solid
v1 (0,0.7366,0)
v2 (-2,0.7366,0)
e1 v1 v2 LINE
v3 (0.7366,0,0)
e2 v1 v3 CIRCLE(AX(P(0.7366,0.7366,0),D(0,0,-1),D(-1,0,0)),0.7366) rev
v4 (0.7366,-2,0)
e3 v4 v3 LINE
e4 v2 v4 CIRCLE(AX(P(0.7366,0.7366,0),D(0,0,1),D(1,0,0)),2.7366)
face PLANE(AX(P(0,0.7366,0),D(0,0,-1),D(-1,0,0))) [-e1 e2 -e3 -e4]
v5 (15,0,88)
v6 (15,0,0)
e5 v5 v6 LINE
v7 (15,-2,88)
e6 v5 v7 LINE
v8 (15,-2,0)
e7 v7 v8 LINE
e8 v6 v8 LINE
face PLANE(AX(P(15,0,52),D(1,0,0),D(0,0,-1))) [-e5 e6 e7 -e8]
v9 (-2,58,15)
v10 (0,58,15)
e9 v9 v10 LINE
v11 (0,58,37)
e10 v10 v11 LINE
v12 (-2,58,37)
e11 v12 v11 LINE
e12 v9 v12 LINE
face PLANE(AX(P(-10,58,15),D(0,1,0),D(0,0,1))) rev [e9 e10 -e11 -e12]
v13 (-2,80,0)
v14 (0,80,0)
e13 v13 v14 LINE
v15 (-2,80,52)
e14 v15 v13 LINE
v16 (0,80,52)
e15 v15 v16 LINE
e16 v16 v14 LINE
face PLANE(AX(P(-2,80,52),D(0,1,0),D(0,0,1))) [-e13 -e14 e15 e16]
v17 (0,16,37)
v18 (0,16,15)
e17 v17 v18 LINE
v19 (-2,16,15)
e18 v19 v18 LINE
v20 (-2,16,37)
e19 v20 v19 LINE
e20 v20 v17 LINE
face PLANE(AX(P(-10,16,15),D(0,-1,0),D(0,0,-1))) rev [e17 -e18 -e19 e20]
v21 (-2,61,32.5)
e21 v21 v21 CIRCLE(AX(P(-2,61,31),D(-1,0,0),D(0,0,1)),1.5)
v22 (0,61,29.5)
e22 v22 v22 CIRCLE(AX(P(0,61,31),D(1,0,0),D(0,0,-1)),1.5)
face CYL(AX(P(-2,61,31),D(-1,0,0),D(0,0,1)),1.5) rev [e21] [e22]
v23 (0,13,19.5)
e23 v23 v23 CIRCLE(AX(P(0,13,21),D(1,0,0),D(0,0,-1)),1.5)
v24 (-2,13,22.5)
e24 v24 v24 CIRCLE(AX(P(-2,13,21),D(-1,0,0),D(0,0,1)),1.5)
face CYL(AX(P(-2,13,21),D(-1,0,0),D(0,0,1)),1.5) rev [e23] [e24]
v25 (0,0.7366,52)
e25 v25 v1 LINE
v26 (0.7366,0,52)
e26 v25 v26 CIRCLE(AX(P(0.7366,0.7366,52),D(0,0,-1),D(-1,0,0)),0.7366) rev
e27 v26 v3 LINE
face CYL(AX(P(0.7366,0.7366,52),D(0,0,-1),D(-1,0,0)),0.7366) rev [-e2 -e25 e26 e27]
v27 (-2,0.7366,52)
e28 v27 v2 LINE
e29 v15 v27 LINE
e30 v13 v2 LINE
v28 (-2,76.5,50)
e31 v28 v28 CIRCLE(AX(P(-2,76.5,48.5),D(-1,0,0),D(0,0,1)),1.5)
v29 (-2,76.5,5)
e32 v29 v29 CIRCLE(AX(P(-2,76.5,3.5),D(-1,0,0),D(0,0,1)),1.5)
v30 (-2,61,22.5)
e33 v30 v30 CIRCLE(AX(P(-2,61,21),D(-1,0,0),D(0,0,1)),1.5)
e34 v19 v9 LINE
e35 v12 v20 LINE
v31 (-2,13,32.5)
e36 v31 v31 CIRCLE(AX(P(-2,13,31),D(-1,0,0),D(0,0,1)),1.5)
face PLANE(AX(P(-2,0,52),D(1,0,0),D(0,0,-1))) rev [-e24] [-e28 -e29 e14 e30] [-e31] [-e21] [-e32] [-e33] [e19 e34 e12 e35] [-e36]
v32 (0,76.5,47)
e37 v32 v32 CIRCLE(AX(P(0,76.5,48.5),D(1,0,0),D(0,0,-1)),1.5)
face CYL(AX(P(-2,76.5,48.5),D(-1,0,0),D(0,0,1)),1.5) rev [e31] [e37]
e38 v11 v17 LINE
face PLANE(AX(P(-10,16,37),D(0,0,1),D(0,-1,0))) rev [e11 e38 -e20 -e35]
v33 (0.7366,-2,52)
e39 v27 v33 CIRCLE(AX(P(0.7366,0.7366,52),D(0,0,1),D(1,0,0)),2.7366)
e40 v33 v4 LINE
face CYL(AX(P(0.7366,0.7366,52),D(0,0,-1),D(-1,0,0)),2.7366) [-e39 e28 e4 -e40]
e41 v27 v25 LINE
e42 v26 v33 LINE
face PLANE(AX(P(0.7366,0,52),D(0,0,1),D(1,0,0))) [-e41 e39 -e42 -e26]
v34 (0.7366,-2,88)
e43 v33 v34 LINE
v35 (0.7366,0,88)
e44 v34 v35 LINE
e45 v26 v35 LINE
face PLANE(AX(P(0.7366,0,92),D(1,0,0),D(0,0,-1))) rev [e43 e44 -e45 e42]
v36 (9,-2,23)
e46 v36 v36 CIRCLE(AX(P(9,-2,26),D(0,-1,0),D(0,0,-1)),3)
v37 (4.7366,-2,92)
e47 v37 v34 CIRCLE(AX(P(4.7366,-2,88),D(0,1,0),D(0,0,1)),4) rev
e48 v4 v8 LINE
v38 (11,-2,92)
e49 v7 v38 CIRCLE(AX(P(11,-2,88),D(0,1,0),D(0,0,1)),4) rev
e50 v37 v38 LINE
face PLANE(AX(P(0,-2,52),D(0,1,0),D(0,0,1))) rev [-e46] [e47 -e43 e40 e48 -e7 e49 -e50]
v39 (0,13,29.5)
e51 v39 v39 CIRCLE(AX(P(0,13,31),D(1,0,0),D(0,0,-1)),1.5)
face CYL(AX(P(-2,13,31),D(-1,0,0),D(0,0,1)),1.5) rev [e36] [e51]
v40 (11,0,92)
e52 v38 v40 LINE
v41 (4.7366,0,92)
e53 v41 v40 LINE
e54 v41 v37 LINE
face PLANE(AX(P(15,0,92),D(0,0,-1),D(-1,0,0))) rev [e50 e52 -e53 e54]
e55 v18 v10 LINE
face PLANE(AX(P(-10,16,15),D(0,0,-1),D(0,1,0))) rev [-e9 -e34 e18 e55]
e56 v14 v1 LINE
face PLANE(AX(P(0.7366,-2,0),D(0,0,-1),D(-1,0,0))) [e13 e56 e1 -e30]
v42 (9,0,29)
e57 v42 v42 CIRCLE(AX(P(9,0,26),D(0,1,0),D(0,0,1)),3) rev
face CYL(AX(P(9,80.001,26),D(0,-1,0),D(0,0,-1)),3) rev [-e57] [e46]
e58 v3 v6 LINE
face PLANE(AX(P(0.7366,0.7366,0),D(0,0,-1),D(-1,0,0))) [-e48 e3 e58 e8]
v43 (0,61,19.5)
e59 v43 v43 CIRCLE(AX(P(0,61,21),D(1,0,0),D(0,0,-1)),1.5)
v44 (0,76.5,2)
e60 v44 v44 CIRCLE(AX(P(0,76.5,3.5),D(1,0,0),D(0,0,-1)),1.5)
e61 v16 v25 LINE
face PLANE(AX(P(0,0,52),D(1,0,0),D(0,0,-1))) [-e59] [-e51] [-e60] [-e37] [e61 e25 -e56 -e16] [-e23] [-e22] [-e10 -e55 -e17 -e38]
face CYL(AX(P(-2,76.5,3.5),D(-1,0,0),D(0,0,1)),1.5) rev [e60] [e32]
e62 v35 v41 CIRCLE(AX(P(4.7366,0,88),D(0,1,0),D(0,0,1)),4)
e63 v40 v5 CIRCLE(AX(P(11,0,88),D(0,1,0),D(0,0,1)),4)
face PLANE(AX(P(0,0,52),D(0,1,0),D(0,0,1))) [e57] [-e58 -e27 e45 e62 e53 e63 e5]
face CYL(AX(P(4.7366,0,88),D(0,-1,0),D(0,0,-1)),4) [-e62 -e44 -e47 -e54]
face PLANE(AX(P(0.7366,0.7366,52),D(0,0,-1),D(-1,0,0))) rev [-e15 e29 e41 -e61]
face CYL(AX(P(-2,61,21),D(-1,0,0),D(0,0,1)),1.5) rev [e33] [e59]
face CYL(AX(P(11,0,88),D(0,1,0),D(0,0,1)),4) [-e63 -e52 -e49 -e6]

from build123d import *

# Parameters (mm, degrees)
SM_BASE_FLANGE_1_DEPTH       = 52
CUT_EXTRUDE_1_REACH          = 100.25
SKETCH_6_R                   = 3
HOLE_WIZARD_M3_2_D           = 2.5
HOLE_WIZARD_M3_2_DEPTH       = 7.5
HOLE_WIZARD_M3_2_CBORE_D     = 3
HOLE_WIZARD_M3_2_CBORE_DEPTH = 6
HOLE_WIZARD_M3_2_TIP         = 0.751075774
SKETCH_9_W                   = 22
SKETCH_9_H                   = 42
CUT_EXTRUDE_2_DEPTH          = 10
SKETCH_10_W                  = 40
SKETCH_10_H                  = 14.2634
EXTRUDE_4_DEPTH              = 2
FILLET_1_R                   = 4


# Sheet-metal steps are written as plain solids
with BuildPart() as part:
    # Sketch 1 → 基材-凸緣1 (new body)
    with BuildSketch(Plane.XY):
        with BuildLine():
            Line((0, 80), (0, 0.7366))
            ThreePointArc((0, 0.7366), (0.215745145, 0.215745145), (0.7366, 0))
            Line((0.7366, 0), (15, 0))
            Line((15, 0), (15, -2))
            Line((15, -2), (0.7366, -2))
            ThreePointArc((0.7366, -2), (-1.198468417, -1.198468417), (-2, 0.7366))
            Line((-2, 0.7366), (-2, 80))
            Line((-2, 80), (0, 80))
        make_face()
    extrude(amount=SM_BASE_FLANGE_1_DEPTH)

    # 草圖6 → 除料-伸長1 (cut, up to next)
    with BuildSketch(Plane.XZ.offset(2), mode=Mode.PRIVATE) as cut_extrude_1_sk1:
        with Locations(Location((9, 26, 0), (0, 0, 270))):
            Circle(SKETCH_6_R)
    cut_extrude_1_tool1 = extrude(cut_extrude_1_sk1.sketch, amount=-CUT_EXTRUDE_1_REACH, mode=Mode.PRIVATE) & part.part
    add(cut_extrude_1_tool1.solids().sort_by_distance((9, -2, 26))[0], mode=Mode.SUBTRACT)

    # M3 螺紋孔2
    with Locations(Plane.ZY.offset(2)):
        with Locations((21, 61), (21, 13), (31, 13), (31, 61), (3.5, 76.5), (48.5, 76.5)):
            CounterBoreHole(HOLE_WIZARD_M3_2_D / 2, HOLE_WIZARD_M3_2_CBORE_D / 2, HOLE_WIZARD_M3_2_CBORE_DEPTH, depth=HOLE_WIZARD_M3_2_DEPTH)
            with Locations((0, 0, -(HOLE_WIZARD_M3_2_DEPTH + HOLE_WIZARD_M3_2_TIP / 2))):  # 118° drill point
                Cone(0, HOLE_WIZARD_M3_2_D / 2, HOLE_WIZARD_M3_2_TIP, mode=Mode.SUBTRACT)

    # 草圖9 → 除料-伸長2 (cut)
    with BuildSketch(Plane(origin=(0, 0, 0), x_dir=(0, 0, -1), z_dir=(1, 0, 0))):
        with Locations((-26, 37)):
            Rectangle(SKETCH_9_W, SKETCH_9_H)
    extrude(amount=-CUT_EXTRUDE_2_DEPTH, mode=Mode.SUBTRACT)

    # 草圖10 → 填料-伸長4 (add)
    with BuildSketch(Plane.ZX.offset(-2)):
        with Locations((72, 7.8683)):
            Rectangle(SKETCH_10_W, SKETCH_10_H)
    extrude(amount=EXTRUDE_4_DEPTH)

    # 圓角1
    fillet_1_edges = [part.edges().sort_by_distance(p)[0] for p in [
        (0.7366, -1, 92),
        (15, -1, 92),
    ]]
    fillet(fillet_1_edges, radius=FILLET_1_R)


solid = part.part
